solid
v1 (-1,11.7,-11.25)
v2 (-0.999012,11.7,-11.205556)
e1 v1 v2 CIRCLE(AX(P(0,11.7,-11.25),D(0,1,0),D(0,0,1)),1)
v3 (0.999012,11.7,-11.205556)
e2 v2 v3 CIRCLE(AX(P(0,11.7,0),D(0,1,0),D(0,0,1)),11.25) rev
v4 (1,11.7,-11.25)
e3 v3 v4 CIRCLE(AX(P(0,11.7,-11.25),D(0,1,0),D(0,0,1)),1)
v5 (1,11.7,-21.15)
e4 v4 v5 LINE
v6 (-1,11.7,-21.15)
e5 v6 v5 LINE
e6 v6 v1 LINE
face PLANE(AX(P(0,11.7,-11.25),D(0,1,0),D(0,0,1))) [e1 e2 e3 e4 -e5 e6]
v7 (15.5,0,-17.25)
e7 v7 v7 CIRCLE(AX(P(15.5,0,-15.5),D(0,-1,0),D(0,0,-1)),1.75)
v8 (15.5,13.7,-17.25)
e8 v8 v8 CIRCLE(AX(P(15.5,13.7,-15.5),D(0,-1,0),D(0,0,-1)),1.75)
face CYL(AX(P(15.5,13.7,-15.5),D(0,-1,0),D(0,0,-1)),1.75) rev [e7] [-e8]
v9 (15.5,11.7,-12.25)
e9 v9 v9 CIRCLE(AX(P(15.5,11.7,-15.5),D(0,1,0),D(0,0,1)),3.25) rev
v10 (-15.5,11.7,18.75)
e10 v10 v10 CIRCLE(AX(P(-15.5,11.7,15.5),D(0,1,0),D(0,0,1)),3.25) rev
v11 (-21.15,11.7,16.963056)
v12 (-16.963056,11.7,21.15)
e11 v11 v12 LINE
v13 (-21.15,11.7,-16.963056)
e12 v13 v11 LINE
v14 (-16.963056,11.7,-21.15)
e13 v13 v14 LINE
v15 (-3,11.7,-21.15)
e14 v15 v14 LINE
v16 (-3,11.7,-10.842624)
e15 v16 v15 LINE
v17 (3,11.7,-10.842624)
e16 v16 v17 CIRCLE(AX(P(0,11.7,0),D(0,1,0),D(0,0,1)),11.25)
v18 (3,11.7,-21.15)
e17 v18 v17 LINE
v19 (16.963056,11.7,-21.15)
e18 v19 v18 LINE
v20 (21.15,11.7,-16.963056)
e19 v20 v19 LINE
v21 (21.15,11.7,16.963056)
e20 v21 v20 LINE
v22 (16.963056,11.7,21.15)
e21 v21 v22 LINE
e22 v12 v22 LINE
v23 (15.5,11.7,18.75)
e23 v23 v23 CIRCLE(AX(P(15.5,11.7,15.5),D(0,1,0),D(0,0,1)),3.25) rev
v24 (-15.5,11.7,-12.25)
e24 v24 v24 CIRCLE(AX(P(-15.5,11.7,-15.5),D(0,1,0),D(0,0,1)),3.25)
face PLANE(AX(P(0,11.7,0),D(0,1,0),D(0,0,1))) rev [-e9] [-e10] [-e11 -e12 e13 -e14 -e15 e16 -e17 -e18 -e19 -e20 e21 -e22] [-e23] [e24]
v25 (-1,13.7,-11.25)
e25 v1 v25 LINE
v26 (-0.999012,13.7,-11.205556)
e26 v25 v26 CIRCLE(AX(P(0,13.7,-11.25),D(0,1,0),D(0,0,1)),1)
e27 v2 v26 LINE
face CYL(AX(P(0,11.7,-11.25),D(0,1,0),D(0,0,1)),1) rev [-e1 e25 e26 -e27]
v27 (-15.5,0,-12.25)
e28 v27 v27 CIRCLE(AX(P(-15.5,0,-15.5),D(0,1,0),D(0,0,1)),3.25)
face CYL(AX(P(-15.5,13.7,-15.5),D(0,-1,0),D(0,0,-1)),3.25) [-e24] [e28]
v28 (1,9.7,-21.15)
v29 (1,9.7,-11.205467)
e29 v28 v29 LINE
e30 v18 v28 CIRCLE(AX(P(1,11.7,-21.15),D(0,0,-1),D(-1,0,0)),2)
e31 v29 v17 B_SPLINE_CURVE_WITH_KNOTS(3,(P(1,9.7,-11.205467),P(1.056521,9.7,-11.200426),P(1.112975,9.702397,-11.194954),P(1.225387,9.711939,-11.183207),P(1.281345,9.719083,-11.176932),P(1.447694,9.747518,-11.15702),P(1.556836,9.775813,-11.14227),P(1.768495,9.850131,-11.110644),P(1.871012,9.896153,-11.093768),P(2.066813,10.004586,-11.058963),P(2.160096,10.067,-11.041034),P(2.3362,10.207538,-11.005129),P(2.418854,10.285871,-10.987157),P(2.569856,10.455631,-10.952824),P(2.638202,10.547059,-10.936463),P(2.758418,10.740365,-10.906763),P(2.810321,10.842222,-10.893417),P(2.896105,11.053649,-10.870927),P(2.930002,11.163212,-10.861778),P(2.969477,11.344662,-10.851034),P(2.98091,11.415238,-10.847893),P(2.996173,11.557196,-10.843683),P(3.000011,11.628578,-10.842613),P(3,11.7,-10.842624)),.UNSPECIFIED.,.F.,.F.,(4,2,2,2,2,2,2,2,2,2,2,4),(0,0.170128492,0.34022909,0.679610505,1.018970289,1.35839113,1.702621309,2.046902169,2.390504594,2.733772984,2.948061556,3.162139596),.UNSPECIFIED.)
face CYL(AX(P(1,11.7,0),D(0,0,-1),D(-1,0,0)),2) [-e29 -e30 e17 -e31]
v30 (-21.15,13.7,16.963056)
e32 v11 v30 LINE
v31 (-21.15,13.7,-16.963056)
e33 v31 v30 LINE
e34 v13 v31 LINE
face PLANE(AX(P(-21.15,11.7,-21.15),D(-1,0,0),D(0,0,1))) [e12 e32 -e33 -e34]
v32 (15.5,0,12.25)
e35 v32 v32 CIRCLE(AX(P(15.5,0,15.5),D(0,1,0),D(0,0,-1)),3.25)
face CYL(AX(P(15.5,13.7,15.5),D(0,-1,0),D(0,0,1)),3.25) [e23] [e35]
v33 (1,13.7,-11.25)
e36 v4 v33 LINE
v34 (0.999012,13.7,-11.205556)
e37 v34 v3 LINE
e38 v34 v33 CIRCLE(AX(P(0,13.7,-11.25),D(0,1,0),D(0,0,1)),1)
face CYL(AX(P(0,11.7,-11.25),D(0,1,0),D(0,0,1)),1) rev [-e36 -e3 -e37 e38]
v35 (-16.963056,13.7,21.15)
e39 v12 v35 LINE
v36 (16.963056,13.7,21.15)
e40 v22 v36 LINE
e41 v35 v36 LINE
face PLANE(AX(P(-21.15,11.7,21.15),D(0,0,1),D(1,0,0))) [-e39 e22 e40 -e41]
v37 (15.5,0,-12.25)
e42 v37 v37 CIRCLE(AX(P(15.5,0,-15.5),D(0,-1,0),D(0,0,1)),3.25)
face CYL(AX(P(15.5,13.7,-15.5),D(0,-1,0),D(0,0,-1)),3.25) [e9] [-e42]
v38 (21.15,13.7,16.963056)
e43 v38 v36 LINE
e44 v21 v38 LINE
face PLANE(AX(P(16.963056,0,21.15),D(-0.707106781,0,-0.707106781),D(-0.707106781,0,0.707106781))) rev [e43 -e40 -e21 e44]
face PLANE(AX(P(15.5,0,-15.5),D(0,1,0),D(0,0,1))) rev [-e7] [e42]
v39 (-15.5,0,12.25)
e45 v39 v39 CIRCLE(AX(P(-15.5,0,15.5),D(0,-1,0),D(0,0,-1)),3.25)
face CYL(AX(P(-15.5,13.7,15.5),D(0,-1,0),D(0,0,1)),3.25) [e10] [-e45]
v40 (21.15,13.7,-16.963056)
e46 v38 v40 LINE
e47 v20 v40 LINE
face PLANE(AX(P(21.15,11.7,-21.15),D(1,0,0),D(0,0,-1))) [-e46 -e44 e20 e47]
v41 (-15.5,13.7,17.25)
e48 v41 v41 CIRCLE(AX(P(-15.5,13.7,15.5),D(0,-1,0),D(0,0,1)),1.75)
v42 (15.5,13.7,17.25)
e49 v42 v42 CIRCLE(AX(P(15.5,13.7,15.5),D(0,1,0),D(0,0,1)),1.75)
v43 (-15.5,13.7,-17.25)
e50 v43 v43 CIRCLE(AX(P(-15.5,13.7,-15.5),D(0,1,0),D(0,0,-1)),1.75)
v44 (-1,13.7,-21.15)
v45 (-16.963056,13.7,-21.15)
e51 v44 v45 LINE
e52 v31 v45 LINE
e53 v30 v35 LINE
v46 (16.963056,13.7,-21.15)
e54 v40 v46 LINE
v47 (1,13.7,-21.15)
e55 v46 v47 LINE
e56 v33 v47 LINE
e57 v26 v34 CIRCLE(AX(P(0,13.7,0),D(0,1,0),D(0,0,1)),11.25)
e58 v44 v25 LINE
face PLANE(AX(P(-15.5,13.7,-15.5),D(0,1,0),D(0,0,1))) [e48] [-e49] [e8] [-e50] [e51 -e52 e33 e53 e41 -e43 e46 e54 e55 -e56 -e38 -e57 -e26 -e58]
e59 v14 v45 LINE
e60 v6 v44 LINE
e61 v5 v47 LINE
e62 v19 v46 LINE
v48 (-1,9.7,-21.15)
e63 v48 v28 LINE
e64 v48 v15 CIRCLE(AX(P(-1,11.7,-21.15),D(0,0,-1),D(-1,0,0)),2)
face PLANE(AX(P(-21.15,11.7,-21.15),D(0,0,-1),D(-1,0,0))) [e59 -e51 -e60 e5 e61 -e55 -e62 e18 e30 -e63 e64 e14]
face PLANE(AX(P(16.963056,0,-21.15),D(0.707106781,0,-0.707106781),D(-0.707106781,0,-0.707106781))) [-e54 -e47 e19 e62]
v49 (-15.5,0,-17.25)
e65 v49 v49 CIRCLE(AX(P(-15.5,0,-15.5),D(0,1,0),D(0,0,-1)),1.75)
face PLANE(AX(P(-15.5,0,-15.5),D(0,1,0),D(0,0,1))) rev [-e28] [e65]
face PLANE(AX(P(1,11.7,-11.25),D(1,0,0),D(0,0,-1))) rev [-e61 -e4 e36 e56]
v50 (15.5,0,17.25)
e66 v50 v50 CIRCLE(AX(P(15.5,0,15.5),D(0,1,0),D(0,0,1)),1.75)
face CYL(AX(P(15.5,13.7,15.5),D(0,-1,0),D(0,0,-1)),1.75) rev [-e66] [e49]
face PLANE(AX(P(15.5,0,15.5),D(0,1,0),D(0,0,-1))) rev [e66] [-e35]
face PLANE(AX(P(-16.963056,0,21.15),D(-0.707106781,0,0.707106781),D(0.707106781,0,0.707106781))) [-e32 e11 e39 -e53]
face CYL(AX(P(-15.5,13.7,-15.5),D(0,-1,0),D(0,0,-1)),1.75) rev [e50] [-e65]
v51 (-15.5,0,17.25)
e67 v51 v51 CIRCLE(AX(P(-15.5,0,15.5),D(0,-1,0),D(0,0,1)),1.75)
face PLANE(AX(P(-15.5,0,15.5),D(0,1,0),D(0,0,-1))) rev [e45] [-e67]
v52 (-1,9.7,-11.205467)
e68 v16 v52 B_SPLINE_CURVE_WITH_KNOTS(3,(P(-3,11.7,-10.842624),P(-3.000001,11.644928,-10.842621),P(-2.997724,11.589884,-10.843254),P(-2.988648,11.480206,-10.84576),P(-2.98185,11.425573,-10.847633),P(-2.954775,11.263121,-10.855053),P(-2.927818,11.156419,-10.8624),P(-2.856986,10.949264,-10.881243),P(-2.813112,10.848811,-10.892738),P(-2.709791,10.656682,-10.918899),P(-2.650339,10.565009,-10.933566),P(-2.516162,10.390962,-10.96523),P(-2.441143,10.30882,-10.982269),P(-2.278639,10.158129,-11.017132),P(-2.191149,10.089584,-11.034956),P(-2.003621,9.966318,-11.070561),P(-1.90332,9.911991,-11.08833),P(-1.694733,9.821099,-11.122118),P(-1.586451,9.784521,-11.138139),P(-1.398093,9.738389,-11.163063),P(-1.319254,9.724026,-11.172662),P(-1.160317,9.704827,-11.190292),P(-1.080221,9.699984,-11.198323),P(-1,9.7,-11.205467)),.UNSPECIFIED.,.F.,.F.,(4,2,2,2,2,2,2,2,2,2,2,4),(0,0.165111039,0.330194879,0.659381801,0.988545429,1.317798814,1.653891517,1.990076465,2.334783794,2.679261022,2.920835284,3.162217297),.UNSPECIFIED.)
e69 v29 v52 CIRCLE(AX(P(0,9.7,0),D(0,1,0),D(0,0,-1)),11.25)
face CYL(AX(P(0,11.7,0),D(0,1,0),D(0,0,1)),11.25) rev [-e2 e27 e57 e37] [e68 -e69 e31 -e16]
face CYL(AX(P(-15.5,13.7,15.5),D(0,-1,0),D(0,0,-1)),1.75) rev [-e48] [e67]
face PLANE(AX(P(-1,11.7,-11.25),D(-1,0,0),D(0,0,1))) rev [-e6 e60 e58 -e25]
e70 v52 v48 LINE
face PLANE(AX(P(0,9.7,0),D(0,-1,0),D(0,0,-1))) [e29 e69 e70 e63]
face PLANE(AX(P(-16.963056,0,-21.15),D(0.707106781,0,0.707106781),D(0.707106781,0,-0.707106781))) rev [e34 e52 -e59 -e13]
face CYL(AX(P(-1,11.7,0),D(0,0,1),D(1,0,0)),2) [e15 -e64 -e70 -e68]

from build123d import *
from build123d.topology import SkipClean

# Parameters (mm, degrees)
SKETCH1_R               = 3.25
BOSS_EXTRUDE1_DEPTH     = 13.7
SKETCH2_W               = 42.3
SKETCH2_H               = 42.3
SKETCH2_R               = 11.25
BOSS_EXTRUDE2_DEPTH     = 2
CUT_EXTRUDE1_DEPTH      = 33.898860163
SKETCH4_R               = 1.75
CUT_EXTRUDE2_DEPTH      = 33.898860163
MIRROR6_COPY_1_SKETCH_R = 1.75
MIRROR6_COPY_1_DEPTH    = 33.898860163
BOSS_EXTRUDE3_DEPTH     = 2
CUT_EXTRUDE3_DEPTH      = 2
FILLET1_R               = 2


with BuildPart() as part:
    # Sketch1 → Boss-Extrude1 (new body)
    with BuildSketch(Plane(origin=(0, 0, 0), x_dir=(1, 0, 0), z_dir=(0, 1, 0))):
        with Locations(Location((-15.5, 15.5, 0), (0, 0, 270))):
            Circle(SKETCH1_R)
    extrude(amount=BOSS_EXTRUDE1_DEPTH)


with BuildPart() as body_2:
    # Mirror2: mirrored copy
    add(part.part.mirror(Plane(origin=(0, 0, 0), x_dir=(0, 0, 1), z_dir=(1, 0, 0))))


with BuildPart() as body_3:
    # Mirror3: mirrored copy
    add(part.part.mirror(Plane.XY))


with BuildPart() as body_4:
    # Mirror3 2: mirrored copy
    add(body_2.part.mirror(Plane.XY))


with BuildPart() as part_1:
    add(part.part)

    add(body_2.part)  # Boss-Extrude2 merges body 2

    add(body_3.part)  # Boss-Extrude2 merges body 3

    add(body_4.part)  # Boss-Extrude2 merges body 4
    # Sketch2 → Boss-Extrude2 (add)
    with BuildSketch(Plane(origin=(0, 13.7, 0), x_dir=(1, 0, 0), z_dir=(0, 1, 0))):
        Rectangle(SKETCH2_W, SKETCH2_H)
        with Locations(Location((0, 0, 0), (0, 0, 270))):
            Circle(SKETCH2_R, mode=Mode.SUBTRACT)
    extrude(amount=-BOSS_EXTRUDE2_DEPTH)

    # Sketch3 → Cut-Extrude1 (cut, through all)
    with BuildSketch(Plane(origin=(0, 13.7, 0), x_dir=(1, 0, 0), z_dir=(0, 1, 0))):
        Polygon((-16.963055506, 21.15), (-21.15, 16.963055506), (-21.15, 21.15), align=None)
        Polygon((16.963055506, -21.15), (21.15, -16.963055506), (21.15, -21.15), align=None)
    cut_extrude1 = extrude(amount=-CUT_EXTRUDE1_DEPTH, mode=Mode.SUBTRACT)

    # Mirror4: Cut-Extrude1 across plane
    add(cut_extrude1.mirror(Plane.XY), mode=Mode.SUBTRACT)

    # Sketch4 → Cut-Extrude2 (cut, through all)
    with BuildSketch(Plane.XZ):
        with Locations(Location((15.5, -15.5, 0), (0, 0, 270))):
            Circle(SKETCH4_R)
    cut_extrude2 = extrude(amount=-CUT_EXTRUDE2_DEPTH, mode=Mode.SUBTRACT)

    # Mirror5: Cut-Extrude2 across plane
    add(cut_extrude2.mirror(Plane(origin=(0, 0, 0), x_dir=(0, 0, 1), z_dir=(1, 0, 0))), mode=Mode.SUBTRACT)

    # Mirror6: Cut-Extrude2 across plane
    add(cut_extrude2.mirror(Plane.XY), mode=Mode.SUBTRACT)

    # Mirror6 copy 1 sketch → Mirror6 copy 1 (cut, through all)
    with BuildSketch(Plane(origin=(0, 0, 0), x_dir=(-1, 0, 0), z_dir=(0, -1, 0))):
        with Locations(Location((15.5, -15.5, 0), (0, 0, 270))):
            Circle(MIRROR6_COPY_1_SKETCH_R)
    extrude(amount=-MIRROR6_COPY_1_DEPTH, mode=Mode.SUBTRACT)

    # Sketch6 → Boss-Extrude3 (add)
    with SkipClean():  # the faces are left unmerged after this step: merging them gives an invalid solid
        with BuildSketch(Plane.XZ.offset(-11.7)):
            with BuildLine():
                Line((-3, -21.15), (-3, -10.842624221))
                ThreePointArc((-3, -10.842624221), (0, -11.25), (3, -10.842624221))
                Line((3, -10.842624221), (3, -21.15))
                Line((3, -21.15), (-3, -21.15))
            make_face()
        extrude(amount=BOSS_EXTRUDE3_DEPTH)

    # Sketch7 → Cut-Extrude3 (cut)
    with SkipClean():  # the faces are left unmerged after this step: merging them gives an invalid solid
        with BuildSketch(Plane(origin=(0, 13.7, 0), x_dir=(1, 0, 0), z_dir=(0, 1, 0))):
            with BuildLine():
                Line((-1, 11.25), (-1, 21.15))
                ThreePointArc((-1, 21.15), (0, 22.15), (1, 21.15))
                Line((1, 21.15), (1, 11.25))
                ThreePointArc((1, 11.25), (0, 10.25), (-1, 11.25))
            make_face()
        extrude(amount=-CUT_EXTRUDE3_DEPTH, mode=Mode.SUBTRACT)

    # Fillet1
    fillet1_edges = [part_1.edges().sort_by_distance(p)[0] for p in [
        (3, 9.7, -15.996312111),
        (-3, 9.7, -15.996312111),
    ]]
    fillet(fillet1_edges, radius=FILLET1_R - 0.0001)  # a hair under: the kernel refuses the full size


solid = part_1.part
